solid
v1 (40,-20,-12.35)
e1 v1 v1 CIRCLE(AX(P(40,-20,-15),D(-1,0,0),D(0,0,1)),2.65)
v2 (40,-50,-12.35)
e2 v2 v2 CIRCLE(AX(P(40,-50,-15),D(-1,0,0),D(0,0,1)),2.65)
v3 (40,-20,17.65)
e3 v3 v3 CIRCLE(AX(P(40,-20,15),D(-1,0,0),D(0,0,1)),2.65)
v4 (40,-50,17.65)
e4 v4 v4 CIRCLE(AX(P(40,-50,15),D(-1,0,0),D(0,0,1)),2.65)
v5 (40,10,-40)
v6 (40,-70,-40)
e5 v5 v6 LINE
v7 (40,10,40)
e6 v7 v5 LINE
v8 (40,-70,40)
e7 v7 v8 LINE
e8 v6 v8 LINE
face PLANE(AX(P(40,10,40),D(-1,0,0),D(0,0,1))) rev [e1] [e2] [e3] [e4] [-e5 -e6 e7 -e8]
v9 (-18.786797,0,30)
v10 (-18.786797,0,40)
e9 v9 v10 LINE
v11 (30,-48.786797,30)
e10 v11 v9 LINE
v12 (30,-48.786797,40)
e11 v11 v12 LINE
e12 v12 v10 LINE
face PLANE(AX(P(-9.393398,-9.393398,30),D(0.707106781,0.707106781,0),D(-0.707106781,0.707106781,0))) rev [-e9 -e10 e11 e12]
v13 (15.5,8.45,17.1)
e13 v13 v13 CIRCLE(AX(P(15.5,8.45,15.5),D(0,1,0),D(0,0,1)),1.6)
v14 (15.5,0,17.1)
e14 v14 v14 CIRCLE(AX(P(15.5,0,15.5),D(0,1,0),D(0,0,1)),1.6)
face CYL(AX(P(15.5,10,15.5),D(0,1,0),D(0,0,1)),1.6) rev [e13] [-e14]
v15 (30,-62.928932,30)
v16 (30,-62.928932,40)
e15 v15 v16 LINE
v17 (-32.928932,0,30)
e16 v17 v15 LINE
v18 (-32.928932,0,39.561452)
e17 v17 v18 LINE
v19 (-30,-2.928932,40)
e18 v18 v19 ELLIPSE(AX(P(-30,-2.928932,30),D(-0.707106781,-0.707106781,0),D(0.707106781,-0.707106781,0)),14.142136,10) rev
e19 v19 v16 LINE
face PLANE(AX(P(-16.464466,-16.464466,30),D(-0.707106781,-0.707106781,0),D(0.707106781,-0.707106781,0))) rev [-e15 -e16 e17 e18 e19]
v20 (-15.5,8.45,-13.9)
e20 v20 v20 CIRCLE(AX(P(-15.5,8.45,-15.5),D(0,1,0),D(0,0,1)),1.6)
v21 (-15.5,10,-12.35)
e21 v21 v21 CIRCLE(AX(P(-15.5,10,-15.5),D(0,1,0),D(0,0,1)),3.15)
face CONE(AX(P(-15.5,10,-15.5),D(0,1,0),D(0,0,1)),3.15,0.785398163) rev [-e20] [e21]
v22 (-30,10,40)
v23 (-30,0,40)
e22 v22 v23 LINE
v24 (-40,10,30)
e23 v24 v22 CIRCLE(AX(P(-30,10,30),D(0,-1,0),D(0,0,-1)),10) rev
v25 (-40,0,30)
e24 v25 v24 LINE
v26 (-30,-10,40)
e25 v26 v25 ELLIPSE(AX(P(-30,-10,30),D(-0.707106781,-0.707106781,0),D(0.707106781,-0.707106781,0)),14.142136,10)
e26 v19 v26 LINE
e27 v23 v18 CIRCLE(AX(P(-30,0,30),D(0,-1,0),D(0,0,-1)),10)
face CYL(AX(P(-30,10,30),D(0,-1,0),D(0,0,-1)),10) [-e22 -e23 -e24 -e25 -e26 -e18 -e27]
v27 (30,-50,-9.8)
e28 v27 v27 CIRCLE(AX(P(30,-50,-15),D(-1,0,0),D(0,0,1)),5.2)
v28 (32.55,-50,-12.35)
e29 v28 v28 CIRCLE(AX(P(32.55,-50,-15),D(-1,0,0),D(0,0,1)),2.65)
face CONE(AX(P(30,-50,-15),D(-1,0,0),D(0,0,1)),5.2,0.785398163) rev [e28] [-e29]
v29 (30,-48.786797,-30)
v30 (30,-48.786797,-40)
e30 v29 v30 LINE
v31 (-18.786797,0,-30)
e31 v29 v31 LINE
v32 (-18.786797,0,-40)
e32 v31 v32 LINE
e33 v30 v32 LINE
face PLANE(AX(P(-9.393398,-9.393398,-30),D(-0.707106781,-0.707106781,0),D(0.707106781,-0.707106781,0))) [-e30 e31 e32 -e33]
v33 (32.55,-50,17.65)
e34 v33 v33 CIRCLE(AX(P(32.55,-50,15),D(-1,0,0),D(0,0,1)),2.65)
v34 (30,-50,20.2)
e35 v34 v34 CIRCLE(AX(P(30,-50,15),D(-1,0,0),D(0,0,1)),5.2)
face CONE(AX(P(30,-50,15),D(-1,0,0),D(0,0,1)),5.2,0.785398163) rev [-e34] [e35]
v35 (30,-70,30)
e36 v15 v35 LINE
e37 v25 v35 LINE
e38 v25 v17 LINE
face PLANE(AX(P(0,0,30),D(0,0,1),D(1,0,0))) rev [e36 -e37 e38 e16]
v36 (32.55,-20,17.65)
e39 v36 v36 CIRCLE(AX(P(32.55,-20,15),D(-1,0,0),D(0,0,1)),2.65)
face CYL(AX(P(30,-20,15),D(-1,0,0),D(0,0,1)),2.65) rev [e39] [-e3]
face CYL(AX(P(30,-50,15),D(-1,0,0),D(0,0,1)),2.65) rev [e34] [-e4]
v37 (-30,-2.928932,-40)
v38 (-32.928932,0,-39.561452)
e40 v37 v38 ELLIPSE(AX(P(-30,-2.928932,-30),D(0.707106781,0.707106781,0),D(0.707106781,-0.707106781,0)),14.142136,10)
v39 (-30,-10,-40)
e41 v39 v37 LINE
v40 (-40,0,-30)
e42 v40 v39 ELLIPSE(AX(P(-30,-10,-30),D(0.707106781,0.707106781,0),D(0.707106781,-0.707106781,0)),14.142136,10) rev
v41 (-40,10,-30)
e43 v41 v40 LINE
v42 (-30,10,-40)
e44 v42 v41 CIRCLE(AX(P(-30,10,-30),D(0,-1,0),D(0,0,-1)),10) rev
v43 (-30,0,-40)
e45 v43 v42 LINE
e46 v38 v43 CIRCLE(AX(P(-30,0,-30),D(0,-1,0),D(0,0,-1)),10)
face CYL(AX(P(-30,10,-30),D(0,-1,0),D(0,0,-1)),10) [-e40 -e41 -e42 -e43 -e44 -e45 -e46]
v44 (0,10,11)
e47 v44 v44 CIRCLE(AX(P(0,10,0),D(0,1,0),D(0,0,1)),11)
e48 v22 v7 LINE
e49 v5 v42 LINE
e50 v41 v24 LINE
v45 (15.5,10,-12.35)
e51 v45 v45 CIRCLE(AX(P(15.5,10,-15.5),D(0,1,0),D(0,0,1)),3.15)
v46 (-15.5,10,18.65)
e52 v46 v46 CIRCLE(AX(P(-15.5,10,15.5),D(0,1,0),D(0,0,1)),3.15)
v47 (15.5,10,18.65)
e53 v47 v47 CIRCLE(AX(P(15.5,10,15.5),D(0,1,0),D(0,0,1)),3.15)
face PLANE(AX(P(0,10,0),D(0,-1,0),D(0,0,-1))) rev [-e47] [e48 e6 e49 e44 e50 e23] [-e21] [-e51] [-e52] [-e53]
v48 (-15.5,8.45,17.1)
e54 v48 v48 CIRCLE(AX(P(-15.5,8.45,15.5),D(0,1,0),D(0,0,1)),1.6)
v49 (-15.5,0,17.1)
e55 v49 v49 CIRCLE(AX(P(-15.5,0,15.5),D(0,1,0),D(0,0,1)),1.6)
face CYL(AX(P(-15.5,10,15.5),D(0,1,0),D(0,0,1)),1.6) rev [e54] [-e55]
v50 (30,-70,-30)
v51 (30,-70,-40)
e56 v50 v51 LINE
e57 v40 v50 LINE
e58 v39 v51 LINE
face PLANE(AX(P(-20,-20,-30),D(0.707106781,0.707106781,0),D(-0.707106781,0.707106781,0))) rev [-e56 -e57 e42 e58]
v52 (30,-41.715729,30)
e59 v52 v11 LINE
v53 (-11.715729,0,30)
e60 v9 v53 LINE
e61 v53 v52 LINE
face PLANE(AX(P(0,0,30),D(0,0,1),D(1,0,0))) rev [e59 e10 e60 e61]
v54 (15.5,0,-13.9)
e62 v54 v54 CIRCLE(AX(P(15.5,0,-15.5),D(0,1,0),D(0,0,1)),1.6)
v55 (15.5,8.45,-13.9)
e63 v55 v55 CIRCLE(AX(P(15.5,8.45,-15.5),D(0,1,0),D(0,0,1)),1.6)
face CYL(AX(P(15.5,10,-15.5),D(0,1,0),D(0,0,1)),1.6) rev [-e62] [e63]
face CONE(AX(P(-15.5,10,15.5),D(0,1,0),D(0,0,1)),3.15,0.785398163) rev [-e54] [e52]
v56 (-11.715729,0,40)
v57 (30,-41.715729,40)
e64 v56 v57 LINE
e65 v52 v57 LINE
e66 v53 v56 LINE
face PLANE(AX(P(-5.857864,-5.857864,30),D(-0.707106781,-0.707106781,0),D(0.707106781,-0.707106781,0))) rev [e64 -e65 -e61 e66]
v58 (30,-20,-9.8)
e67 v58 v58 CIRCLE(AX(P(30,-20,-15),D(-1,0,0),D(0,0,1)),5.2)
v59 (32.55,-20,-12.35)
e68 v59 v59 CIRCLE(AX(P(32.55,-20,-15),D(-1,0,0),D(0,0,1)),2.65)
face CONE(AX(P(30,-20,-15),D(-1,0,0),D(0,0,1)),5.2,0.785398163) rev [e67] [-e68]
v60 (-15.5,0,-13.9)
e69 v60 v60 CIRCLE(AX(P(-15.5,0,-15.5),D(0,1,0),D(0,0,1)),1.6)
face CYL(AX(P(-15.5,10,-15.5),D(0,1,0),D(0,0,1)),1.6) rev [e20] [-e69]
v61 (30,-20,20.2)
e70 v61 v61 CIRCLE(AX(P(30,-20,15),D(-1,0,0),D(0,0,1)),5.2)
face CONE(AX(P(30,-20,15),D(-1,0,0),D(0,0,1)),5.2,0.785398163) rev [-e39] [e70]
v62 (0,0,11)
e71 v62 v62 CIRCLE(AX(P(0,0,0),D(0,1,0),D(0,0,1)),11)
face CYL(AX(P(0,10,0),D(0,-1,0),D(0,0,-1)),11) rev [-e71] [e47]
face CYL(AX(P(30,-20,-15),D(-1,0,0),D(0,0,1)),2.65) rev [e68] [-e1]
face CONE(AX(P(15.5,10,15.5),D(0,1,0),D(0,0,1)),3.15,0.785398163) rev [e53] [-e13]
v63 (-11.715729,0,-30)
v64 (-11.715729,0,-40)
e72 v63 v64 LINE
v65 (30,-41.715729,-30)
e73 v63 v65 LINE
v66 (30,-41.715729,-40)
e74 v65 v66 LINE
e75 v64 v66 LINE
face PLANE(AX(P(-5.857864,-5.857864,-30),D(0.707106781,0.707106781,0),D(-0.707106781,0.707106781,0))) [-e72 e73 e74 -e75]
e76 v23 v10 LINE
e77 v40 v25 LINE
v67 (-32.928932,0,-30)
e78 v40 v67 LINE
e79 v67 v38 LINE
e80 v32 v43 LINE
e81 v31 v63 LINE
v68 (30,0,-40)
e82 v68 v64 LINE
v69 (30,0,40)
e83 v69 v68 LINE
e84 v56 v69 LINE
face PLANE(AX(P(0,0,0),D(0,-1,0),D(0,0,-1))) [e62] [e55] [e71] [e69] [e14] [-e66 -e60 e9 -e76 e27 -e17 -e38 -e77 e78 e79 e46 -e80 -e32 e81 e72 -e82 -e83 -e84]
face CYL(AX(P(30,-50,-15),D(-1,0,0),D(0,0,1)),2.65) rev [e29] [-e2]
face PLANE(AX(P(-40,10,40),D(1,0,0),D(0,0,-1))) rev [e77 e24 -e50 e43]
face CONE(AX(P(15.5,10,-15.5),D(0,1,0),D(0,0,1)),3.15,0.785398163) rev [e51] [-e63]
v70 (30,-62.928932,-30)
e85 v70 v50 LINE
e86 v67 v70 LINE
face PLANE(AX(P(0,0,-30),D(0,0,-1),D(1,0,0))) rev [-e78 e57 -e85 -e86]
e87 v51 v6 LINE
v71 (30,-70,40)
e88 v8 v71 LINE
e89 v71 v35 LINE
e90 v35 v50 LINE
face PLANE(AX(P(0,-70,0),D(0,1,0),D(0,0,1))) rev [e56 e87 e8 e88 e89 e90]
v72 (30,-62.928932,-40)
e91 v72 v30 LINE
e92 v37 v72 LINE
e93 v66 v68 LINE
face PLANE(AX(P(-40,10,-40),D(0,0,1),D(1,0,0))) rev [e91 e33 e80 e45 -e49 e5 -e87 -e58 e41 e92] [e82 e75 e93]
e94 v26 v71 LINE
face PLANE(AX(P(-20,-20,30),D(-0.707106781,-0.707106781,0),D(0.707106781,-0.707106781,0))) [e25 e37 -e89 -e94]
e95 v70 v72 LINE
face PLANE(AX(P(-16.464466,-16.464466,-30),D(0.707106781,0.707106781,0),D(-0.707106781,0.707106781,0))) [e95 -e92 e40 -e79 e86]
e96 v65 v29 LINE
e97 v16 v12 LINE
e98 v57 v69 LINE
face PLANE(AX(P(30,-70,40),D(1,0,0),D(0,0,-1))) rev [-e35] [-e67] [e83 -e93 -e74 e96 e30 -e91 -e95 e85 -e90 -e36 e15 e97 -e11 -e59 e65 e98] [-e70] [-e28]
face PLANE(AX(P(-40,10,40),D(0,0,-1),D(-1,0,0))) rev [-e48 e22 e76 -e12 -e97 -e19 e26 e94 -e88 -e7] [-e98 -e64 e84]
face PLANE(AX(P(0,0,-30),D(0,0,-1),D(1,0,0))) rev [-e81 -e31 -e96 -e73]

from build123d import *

# Parameters (mm, degrees)
SKETCH1_W                                           = 80
SKETCH1_H                                           = 80
SKETCH1_R                                           = 11
BOSS_EXTRUDE1_DEPTH                                 = 10
CSK_FOR_M3_COUNTERSUNK_FLAT_HEAD_SCREW1_D           = 3.2
CSK_FOR_M3_COUNTERSUNK_FLAT_HEAD_SCREW1_CSINK_D     = 6.3
CSK_FOR_M3_COUNTERSUNK_FLAT_HEAD_SCREW1_CSINK_ANGLE = 90
SKETCH5_W                                           = 10
SKETCH5_H                                           = 80
BOSS_EXTRUDE2_DEPTH                                 = 70
BOSS_EXTRUDE3_DEPTH                                 = 10
CSK_FOR_M5_COUNTERSUNK_FLAT_HEAD_SCREW1_D           = 5.3
CSK_FOR_M5_COUNTERSUNK_FLAT_HEAD_SCREW1_CSINK_D     = 10.4
CSK_FOR_M5_COUNTERSUNK_FLAT_HEAD_SCREW1_CSINK_ANGLE = 90
FILLET1_R                                           = 10


with BuildPart() as part:
    # Sketch1 → Boss-Extrude1 (new body)
    with BuildSketch(Plane(origin=(0, 0, 0), x_dir=(1, 0, 0), z_dir=(0, 1, 0))):
        Rectangle(SKETCH1_W, SKETCH1_H)
        with Locations(Location((0, 0, 0), (0, 0, 270))):
            Circle(SKETCH1_R, mode=Mode.SUBTRACT)
    extrude(amount=BOSS_EXTRUDE1_DEPTH)

    # CSK for M3 Countersunk Flat Head Screw1 (through all)
    with Locations(Plane(origin=(0, 10, 0), x_dir=(1, 0, 0), z_dir=(0, 1, 0))):
        with Locations((-15.5, 15.5), (15.5, 15.5), (15.5, -15.5), (-15.5, -15.5)):
            CounterSinkHole(CSK_FOR_M3_COUNTERSUNK_FLAT_HEAD_SCREW1_D / 2, CSK_FOR_M3_COUNTERSUNK_FLAT_HEAD_SCREW1_CSINK_D / 2, counter_sink_angle=CSK_FOR_M3_COUNTERSUNK_FLAT_HEAD_SCREW1_CSINK_ANGLE)

    # Sketch5 → Boss-Extrude2 (add)
    with BuildSketch(Plane(origin=(0, 0, 0), x_dir=(-1, 0, 0), z_dir=(0, -1, 0))):
        with Locations((-35, 0)):
            Rectangle(SKETCH5_W, SKETCH5_H)
    extrude(amount=BOSS_EXTRUDE2_DEPTH)

    # Sketch6 → Boss-Extrude3 (add)
    with BuildSketch(Plane.XY.offset(40)):
        Polygon((-11.715728753, 0), (-18.786796564, 0), (-15.251262658, -3.535533906), (26.464466094, -45.251262658), (30, -48.786796564), (30, -41.715728753), align=None)
        Polygon((-32.928932188, 0), (-40, 0), (30, -70), (30, -62.928932188), align=None)
    boss_extrude3 = extrude(amount=-BOSS_EXTRUDE3_DEPTH)

    # Mirror1: Boss-Extrude3 across plane
    add(boss_extrude3.mirror(Plane.XY))

    # CSK for M5 Countersunk Flat Head Screw1 (through all)
    with Locations(Plane.ZY.offset(-30)):
        with Locations((15, -20), (15, -50), (-15, -50), (-15, -20)):
            CounterSinkHole(CSK_FOR_M5_COUNTERSUNK_FLAT_HEAD_SCREW1_D / 2, CSK_FOR_M5_COUNTERSUNK_FLAT_HEAD_SCREW1_CSINK_D / 2, counter_sink_angle=CSK_FOR_M5_COUNTERSUNK_FLAT_HEAD_SCREW1_CSINK_ANGLE)

    # Fillet1
    # the kernel refuses this fillet: 10 mm, written as the material it takes off along each edge
    with BuildSketch(Plane(origin=(-40, -25, -40), x_dir=(1, 0, 0), z_dir=(0, 1, 0))) as fillet1_piece_1:
        with BuildLine():
            CenterArc((FILLET1_R, -FILLET1_R), FILLET1_R, 90, 90)
            Line((0, -FILLET1_R), (0, 0))
            Line((0, 0), (FILLET1_R, 0))
        make_face()
    extrude(amount=60, mode=Mode.SUBTRACT)
    with BuildSketch(Plane(origin=(-40, -25, 40), x_dir=(1, 0, 0), z_dir=(0, 1, 0))) as fillet1_piece_2:
        with BuildLine():
            CenterArc((FILLET1_R, FILLET1_R), FILLET1_R, 180, 90)
            Line((0, FILLET1_R), (0, 0))
            Line((0, 0), (FILLET1_R, 0))
        make_face()
    extrude(amount=60, mode=Mode.SUBTRACT)


solid = part.part
